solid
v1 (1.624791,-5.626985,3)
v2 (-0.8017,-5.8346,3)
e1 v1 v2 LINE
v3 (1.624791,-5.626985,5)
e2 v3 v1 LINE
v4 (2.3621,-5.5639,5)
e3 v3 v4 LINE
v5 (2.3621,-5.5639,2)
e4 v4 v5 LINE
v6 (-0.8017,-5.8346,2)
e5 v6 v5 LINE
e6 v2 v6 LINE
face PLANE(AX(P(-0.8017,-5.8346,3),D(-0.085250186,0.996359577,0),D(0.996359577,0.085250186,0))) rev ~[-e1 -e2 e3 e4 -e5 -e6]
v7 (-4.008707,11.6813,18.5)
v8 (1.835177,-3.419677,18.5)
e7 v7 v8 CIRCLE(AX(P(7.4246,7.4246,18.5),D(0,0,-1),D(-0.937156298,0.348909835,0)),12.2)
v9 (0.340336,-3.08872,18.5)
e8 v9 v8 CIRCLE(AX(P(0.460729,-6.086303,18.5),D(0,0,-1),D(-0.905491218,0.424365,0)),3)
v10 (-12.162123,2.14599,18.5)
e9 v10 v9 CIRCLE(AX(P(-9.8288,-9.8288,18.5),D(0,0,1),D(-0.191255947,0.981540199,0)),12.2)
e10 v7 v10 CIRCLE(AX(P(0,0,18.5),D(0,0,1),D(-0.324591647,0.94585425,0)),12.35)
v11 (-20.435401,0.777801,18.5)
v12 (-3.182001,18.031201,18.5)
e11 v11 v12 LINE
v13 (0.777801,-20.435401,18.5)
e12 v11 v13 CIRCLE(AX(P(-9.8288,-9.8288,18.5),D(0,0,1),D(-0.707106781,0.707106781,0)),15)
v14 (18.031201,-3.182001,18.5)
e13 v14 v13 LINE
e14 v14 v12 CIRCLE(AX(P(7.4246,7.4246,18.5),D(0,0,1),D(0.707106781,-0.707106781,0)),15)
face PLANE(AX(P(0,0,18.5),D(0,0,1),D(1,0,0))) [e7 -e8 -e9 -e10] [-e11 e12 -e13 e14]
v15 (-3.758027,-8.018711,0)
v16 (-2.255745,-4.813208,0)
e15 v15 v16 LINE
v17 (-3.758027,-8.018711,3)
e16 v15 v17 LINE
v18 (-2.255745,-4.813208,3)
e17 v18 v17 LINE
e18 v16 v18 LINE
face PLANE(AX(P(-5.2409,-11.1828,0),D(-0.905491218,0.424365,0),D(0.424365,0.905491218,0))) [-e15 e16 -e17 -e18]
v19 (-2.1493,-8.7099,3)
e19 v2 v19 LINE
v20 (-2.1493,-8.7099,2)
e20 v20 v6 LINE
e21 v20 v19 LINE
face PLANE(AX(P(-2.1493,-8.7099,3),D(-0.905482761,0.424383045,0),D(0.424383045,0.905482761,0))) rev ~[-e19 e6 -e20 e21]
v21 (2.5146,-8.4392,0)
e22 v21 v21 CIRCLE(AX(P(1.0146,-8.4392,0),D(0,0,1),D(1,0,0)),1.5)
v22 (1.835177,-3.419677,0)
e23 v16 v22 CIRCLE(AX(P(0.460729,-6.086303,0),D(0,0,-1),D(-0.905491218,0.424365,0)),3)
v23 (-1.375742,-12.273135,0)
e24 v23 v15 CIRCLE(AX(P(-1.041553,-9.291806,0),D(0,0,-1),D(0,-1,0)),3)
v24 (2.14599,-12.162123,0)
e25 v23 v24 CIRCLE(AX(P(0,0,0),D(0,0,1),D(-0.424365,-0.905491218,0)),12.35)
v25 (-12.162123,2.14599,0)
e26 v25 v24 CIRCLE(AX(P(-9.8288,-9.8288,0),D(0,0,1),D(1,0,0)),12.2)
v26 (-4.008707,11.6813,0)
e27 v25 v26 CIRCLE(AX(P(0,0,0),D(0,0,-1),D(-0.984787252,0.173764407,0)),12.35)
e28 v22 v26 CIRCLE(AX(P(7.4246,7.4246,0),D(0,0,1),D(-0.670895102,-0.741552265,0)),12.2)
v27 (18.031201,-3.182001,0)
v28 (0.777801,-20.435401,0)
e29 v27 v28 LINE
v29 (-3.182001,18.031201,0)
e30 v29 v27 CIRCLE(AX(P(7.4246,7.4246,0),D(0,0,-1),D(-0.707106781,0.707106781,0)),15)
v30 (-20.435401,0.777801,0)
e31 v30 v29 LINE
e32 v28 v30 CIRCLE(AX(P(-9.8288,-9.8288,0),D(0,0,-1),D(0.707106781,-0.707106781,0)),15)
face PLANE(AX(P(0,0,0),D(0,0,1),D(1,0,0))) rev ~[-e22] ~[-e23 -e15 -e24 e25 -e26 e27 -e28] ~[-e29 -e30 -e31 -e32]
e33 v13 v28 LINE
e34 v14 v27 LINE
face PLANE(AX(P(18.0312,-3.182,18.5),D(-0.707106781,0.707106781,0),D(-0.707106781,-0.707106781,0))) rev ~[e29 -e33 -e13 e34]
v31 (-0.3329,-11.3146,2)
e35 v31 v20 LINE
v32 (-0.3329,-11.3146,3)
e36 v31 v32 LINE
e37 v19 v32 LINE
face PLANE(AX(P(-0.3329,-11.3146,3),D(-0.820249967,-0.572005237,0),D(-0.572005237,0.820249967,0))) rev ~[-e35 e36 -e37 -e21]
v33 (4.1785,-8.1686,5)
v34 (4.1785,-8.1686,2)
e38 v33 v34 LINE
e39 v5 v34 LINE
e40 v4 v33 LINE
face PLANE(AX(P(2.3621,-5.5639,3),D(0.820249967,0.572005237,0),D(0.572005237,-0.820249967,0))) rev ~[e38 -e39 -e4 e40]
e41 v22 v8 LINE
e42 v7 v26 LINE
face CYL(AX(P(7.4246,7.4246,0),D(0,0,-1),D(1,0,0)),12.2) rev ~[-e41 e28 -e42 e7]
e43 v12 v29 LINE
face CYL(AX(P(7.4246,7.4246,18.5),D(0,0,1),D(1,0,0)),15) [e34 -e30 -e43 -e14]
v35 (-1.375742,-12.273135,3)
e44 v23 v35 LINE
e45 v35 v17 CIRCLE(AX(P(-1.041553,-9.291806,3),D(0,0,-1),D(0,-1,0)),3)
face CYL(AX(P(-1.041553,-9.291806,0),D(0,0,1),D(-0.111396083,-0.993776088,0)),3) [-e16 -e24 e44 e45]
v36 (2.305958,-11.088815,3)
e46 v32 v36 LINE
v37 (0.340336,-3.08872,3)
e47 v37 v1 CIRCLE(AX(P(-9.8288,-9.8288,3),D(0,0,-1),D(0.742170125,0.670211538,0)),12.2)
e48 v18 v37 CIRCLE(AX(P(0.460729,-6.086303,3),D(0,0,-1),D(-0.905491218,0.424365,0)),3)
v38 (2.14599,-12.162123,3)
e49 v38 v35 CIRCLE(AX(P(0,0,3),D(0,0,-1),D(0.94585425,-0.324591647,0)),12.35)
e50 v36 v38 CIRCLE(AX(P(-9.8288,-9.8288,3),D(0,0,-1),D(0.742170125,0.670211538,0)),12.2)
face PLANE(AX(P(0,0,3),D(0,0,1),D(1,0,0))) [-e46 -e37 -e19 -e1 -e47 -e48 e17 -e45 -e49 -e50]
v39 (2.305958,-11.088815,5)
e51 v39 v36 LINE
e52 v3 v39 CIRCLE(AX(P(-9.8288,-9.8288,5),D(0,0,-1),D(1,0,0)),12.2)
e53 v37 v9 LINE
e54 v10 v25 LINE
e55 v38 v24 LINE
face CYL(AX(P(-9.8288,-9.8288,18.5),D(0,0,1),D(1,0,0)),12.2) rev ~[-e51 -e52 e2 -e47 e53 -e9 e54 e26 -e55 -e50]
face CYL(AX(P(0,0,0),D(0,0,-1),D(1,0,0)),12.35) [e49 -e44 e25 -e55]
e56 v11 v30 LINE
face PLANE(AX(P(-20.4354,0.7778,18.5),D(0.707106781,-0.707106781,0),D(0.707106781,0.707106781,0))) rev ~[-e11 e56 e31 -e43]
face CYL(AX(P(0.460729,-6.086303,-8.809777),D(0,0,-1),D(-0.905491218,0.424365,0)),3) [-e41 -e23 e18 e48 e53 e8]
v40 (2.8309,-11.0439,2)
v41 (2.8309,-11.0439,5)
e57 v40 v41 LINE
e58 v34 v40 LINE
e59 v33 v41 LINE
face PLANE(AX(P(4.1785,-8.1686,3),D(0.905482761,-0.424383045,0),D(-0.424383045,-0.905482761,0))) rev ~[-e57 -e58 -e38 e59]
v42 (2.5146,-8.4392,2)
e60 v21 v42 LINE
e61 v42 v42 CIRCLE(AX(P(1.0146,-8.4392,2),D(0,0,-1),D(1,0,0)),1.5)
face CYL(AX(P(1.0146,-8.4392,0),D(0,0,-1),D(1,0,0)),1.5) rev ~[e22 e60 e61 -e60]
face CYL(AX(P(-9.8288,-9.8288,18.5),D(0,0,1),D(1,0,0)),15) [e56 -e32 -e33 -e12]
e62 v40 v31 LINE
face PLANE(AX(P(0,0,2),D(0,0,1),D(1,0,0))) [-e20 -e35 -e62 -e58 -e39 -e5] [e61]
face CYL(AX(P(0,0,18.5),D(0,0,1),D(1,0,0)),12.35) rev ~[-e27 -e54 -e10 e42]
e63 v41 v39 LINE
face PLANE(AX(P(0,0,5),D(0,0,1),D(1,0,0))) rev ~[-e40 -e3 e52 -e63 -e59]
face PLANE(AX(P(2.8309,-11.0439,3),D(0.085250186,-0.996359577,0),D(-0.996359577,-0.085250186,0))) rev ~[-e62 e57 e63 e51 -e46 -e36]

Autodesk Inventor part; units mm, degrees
ref_plane "YZ Plane" through (0, 0, 0) normal (1, 0, 0) x (0, 1, 0)
ref_plane "XZ Plane" through (0, 0, 0) normal (0, 1, 0) x (-1, 0, 0)
ref_plane "XY Plane" through (0, 0, 0) normal (0, 0, 1) x (1, 0, 0)
sketch "Sketch1" plane through (0, 0, 0) normal (0, 0, 1) x (1, 0, 0)
  circle A0 centre (0, 0) radius 12.35
  circle A1 centre (7.4246, 7.4246) radius 12.2
  line L0 (-13.413, -13.413) -> (25.4094, 25.4094) construction
  line L1 (-10.6165, 0) -> (15.2552, 0) construction
  line L2 (7.4246, 7.4246) -> (15.8638, 6.41) construction
  line L3 (16.6649, 18.5138) -> (22.6753, 24.5242) construction
  circle A2 centre (15.8638, 6.41) radius 1.5
  line L4 (7.4246, 7.4246) -> (-1.0146, 8.4392) construction
  circle A3 centre (-1.0146, 8.4392) radius 1.5
  line L5 (0, 0) -> (-1.0146, 8.4392) construction
  line L6 (0, 0) -> (1.0146, -8.4392) construction
  circle A4 centre (1.0146, -8.4392) radius 1.5
  circle A5 centre (-9.8288, -9.8288) radius 12.2
  line L7 (-5.2409, -11.1828) -> (0, 0)
  point P0 (11.6813, -4.0087)
  point P1 (-0.7603, -1.6223)
  dimension "d0" = 24.7
  dimension "d1" = 24.4
  dimension "d2" = 0
  dimension "d3" = 45
  dimension "d4" = 0
  dimension "d5" = 10.5
  dimension "d20" = 8.5
  dimension "d21" = 3
  dimension "d22" = 3
  dimension "d23" = 3
  dimension "d24" = 24.4
  dimension "d25" = 24.4
  dimension "d26" = 4.5
extrude "Extrusion1" add sketch "Sketch1" along normal blind 3 contours A0 A5 A4 L7 A1 | A0 L7 A5 A4
sketch "Sketch3" plane through (0, 0, 3) normal (0, 0, 1) x (1, 0, 0)
  circle A0 centre (0, 0) radius 12.35
  circle A1 centre (7.4246, 7.4246) radius 12.2
  line L0 (-13.413, -13.413) -> (25.4094, 25.4094) construction
  line L1 (-10.6165, 0) -> (15.2552, 0) construction
  line L2 (7.4246, 7.4246) -> (15.8638, 6.41) construction
  line L3 (16.6649, 18.5138) -> (22.6753, 24.5242) construction
  circle A2 centre (15.8638, 6.41) radius 1.5
  line L4 (7.4246, 7.4246) -> (-1.0146, 8.4392) construction
  circle A3 centre (-1.0146, 8.4392) radius 1.5
  line L5 (0, 0) -> (-1.0146, 8.4392) construction
  line L6 (0, 0) -> (1.0146, -8.4392) construction
  circle A4 centre (1.0146, -8.4392) radius 1.5
  circle A5 centre (-9.8288, -9.8288) radius 12.2
  line L7 (-5.2409, -11.1828) -> (0, 0)
  point P0 (11.6813, -4.0087)
  point P1 (-0.7603, -1.6223)
  point P2 (-0.7743, -1.6522)
  point P3 (2.1356, -7.4425)
  point P4 (2.3507, -9.1211)
  point P5 (2.146, -12.1621)
  dimension "d32" = 24.7
  dimension "d33" = 24.4
  dimension "d34" = 0
  dimension "d35" = 45
  dimension "d36" = 0
  dimension "d37" = 10.5
  dimension "d38" = 8.5
  dimension "d39" = 3
  dimension "d40" = 3
  dimension "d41" = 3
  dimension "d42" = 24.4
  dimension "d43" = 24.4
  dimension "d44" = 4.5
extrude "Extrusion3" add sketch "Sketch3" along normal blind 15.5 contours A0 A5 A4 L7 A1 | A4 A5 picked at (2.3363, -8.2121)
sketch "Sketch4" plane through (0, 0, 3) normal (0, 0, 1) x (1, 0, 0)
  line L0 (-2.1493, -8.7099) -> (-0.8017, -5.8346)
  line L1 (-0.8017, -5.8346) -> (2.3621, -5.5639)
  line L2 (2.3621, -5.5639) -> (4.1785, -8.1686)
  line L3 (4.1785, -8.1686) -> (2.8309, -11.0439)
  line L4 (2.8309, -11.0439) -> (-0.3329, -11.3146)
  line L5 (-0.3329, -11.3146) -> (-2.1493, -8.7099)
  point P0 (0, 0)
  point P1 (1.0146, -8.4392)
  dimension "d49" = 5.5
extrude "Extrusion4" cut sketch "Sketch4" along normal blind 2 and the other way blind 1
sketch "Sketch5" plane through (0, 0, 18.5) normal (0, 0, 1) x (1, 0, 0)
  circle A0 centre (0, 0) radius 12.35
  circle A1 centre (7.4246, 7.4246) radius 12.2
  line L0 (-13.413, -13.413) -> (25.4094, 25.4094) construction
  line L1 (-10.6165, 0) -> (15.2552, 0) construction
  line L2 (7.4246, 7.4246) -> (15.8638, 6.41) construction
  line L3 (16.6649, 18.5138) -> (22.6753, 24.5242) construction
  circle A2 centre (15.8638, 6.41) radius 1.5
  line L4 (7.4246, 7.4246) -> (-1.0146, 8.4392) construction
  circle A3 centre (-1.0146, 8.4392) radius 1.5
  line L5 (0, 0) -> (-1.0146, 8.4392) construction
  line L6 (0, 0) -> (1.0146, -8.4392) construction
  circle A4 centre (1.0146, -8.4392) radius 1.5
  circle A5 centre (-9.8288, -9.8288) radius 12.2
  line L7 (-5.2409, -11.1828) -> (0, 0)
  line L8 (-31.042, -9.8288) -> (7.4246, 28.6378)
  line L9 (7.4246, 28.6378) -> (28.6378, 7.4246)
  line L10 (28.6378, 7.4246) -> (-9.8288, -31.042)
  line L11 (-9.8288, -31.042) -> (-31.042, -9.8288)
  circle A6 centre (-9.8288, -9.8288) radius 15
  circle A7 centre (7.4246, 7.4246) radius 15
  point P0 (11.6813, -4.0087)
  point P1 (-0.7603, -1.6223)
  point P2 (2.146, -12.1621)
  point P3 (-12.1621, 2.146)
  point P4 (-4.0087, 11.6813)
  point P5 (0.7778, -20.4354)
  point P6 (18.0312, -3.182)
  point P7 (-3.182, 18.0312)
  point P8 (-20.4354, 0.7778)
  dimension "d54" = 24.7
  dimension "d55" = 24.4
  dimension "d56" = 0
  dimension "d57" = 45
  dimension "d58" = 0
  dimension "d59" = 10.5
  dimension "d60" = 8.5
  dimension "d61" = 3
  dimension "d62" = 3
  dimension "d63" = 3
  dimension "d64" = 24.4
  dimension "d65" = 24.4
  dimension "d66" = 4.5
  dimension "d67" = 15
  dimension "d68" = 15
  dimension "d69" = 30
  dimension "d70" = 15
extrude "Extrusion5" add sketch "Sketch5" against normal blind 18.5 contours A0 A7 A1 | A0 A6 L8 A7 | A7 L10 A6 A0 | A0 A5 A6
fillet "Fillet1" radius 3 1 edges at (-5.2409, -11.1828, 1.5)
fillet "Fillet2" radius 3 1 edges at (-0.7603, -1.6223, 9.25)
properties part number "Hiolder_28"
